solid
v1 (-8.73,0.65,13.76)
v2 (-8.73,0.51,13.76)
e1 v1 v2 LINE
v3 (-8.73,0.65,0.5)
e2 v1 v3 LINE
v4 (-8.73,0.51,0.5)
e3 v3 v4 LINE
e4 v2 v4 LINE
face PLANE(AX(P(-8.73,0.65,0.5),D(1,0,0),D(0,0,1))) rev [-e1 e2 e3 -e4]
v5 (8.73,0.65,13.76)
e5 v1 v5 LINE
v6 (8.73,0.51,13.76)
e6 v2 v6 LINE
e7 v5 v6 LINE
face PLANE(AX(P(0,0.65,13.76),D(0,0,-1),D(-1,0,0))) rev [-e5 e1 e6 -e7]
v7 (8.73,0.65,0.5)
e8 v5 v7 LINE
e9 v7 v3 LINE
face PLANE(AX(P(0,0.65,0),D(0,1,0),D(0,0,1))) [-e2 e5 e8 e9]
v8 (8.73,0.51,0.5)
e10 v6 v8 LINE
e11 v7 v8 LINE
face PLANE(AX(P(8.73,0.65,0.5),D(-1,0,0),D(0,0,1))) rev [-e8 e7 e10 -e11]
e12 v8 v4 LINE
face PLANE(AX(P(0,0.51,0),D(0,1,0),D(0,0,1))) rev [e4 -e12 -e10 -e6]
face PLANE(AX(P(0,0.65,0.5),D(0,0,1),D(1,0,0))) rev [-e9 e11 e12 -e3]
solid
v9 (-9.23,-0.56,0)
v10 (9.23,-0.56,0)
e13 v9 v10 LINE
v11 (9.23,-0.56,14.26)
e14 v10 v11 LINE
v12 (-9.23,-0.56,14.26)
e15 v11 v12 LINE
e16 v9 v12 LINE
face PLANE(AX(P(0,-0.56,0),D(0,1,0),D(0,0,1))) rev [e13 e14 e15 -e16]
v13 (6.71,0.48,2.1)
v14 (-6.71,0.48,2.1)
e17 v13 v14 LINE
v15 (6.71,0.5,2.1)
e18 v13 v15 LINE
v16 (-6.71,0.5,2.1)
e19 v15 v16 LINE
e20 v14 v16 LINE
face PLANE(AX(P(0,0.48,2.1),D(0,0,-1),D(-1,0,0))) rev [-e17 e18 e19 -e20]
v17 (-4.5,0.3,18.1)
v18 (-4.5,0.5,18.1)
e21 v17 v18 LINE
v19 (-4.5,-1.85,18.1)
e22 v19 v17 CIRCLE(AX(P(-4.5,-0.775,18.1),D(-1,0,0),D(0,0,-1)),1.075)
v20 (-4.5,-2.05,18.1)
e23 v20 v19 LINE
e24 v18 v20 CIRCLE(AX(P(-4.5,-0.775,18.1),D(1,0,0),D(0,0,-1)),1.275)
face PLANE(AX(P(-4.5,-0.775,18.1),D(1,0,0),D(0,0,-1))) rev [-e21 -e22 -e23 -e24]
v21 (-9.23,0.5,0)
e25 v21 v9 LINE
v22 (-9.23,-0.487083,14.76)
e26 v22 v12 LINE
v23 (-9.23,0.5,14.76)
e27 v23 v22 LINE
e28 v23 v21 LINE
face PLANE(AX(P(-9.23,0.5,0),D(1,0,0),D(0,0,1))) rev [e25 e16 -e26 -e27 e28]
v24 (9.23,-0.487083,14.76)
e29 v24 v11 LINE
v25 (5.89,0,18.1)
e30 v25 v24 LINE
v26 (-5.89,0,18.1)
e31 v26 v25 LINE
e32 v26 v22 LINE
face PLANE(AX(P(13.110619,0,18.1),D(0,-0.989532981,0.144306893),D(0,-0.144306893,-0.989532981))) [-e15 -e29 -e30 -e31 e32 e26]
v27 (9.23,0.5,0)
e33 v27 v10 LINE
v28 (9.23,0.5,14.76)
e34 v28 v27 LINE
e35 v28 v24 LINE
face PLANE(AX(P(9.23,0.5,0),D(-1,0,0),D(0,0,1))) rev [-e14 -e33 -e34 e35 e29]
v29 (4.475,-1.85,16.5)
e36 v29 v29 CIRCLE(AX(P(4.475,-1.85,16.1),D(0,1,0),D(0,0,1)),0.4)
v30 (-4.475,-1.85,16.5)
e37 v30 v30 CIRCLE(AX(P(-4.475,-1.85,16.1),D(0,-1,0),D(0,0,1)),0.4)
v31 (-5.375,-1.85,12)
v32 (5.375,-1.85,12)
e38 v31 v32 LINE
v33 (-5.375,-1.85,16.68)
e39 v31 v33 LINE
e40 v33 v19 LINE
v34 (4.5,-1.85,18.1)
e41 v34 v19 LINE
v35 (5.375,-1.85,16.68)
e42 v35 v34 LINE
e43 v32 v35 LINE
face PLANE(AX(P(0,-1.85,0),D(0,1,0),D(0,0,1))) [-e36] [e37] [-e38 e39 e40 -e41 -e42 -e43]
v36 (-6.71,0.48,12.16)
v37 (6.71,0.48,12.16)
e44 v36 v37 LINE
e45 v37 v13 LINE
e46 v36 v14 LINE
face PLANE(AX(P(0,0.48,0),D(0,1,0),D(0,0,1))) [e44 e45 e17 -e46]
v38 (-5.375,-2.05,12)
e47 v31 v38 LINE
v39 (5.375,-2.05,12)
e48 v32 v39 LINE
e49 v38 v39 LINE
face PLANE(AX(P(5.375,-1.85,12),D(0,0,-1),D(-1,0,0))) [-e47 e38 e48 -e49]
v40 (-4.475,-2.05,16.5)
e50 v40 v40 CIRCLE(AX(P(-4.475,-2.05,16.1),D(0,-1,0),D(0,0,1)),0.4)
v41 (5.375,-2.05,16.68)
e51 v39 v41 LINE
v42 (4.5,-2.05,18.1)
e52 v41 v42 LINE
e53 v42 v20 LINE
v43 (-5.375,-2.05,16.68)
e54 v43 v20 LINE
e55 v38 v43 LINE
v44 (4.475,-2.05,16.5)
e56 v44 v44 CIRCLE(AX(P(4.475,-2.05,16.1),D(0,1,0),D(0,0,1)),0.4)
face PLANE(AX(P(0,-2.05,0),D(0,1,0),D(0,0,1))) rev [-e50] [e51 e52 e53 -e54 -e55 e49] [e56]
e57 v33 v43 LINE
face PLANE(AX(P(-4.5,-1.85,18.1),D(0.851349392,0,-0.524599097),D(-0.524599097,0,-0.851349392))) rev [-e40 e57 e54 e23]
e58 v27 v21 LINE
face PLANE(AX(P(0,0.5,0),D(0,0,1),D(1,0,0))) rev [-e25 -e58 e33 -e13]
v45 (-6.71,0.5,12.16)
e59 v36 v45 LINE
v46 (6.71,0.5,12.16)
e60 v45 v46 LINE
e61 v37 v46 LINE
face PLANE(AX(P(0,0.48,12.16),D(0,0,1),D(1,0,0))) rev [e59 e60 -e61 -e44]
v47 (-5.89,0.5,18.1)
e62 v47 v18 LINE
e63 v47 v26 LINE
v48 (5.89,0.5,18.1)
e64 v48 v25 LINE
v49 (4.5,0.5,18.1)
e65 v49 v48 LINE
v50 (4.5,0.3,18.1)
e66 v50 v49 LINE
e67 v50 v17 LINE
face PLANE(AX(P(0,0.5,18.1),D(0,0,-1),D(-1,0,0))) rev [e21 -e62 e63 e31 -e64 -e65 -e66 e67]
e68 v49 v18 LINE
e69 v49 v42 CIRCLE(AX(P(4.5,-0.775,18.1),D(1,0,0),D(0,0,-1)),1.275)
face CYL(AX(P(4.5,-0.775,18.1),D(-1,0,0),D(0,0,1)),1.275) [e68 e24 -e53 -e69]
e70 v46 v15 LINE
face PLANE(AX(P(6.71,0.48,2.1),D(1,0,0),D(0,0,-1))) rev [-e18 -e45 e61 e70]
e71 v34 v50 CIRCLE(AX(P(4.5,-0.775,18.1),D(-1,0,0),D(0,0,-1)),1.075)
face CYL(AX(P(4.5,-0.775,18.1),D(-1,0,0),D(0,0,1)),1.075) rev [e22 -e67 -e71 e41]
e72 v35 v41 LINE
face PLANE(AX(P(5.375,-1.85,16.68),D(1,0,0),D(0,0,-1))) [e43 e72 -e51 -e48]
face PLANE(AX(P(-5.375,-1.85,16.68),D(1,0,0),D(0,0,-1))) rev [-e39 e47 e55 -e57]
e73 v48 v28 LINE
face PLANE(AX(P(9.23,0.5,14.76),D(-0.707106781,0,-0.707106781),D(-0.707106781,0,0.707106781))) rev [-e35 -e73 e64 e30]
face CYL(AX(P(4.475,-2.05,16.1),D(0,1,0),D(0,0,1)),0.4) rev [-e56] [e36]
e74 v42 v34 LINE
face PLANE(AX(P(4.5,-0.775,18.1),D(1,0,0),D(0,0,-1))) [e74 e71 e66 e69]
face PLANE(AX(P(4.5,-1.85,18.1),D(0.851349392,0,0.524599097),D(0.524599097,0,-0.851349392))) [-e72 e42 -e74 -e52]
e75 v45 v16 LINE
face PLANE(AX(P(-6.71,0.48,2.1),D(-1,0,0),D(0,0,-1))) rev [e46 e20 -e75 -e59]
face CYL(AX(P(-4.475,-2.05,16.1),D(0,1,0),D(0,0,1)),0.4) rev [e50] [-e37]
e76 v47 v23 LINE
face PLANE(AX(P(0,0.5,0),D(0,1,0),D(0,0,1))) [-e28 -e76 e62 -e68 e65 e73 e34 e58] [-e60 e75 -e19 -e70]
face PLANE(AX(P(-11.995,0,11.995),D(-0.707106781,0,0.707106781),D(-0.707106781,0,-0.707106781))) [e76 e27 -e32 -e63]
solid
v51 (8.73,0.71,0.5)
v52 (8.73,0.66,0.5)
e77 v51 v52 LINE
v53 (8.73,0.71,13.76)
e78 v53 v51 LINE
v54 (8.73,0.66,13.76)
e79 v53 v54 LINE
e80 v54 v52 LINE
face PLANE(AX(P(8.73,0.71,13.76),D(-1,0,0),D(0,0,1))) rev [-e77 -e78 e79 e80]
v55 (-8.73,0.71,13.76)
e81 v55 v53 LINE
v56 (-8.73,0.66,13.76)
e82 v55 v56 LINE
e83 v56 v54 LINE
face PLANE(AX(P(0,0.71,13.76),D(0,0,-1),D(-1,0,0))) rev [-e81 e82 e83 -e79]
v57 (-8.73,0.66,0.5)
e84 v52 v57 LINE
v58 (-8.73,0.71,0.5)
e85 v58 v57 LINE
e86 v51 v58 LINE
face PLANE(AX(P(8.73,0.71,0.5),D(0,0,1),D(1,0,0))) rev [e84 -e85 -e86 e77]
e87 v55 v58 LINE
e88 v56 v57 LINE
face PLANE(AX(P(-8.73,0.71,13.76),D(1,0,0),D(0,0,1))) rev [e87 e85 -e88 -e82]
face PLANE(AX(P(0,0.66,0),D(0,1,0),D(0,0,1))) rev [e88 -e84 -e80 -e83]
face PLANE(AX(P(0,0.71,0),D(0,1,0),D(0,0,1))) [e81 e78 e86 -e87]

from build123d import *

# Parameters (mm, degrees)
EXTRUDE_1_DEPTH      = 0.5
SKETCH_3_W           = 9.23
SKETCH_3_H           = 14.26
EXTRUDE_2_DEPTH      = 0.56
SKETCH_4_W           = 8.73
SKETCH_4_H           = 13.26
EXTRUDE_3_DEPTH      = 0.14
SKETCH_6_W           = 6.71
SKETCH_6_H           = 10.06
CUT_EXTRUDE_1_DEPTH  = 0.02
EXTRUDE_4_REACH      = 22.328
CUT_EXTRUDE_2_DEPTH  = 21.327946281
SKETCH_9_W           = 8.73
SKETCH_9_H           = 13.26
EXTRUDE_2204_DEPTH   = 0.05
MIRROR_START         = 0.5
MIRROR_1_OUTLINE_W   = 8.73
MIRROR_1_OUTLINE_H   = 0.05
MIRROR_1_DEPTH       = 13.26
MIRROR_1_2_OUTLINE_W = 8.73
MIRROR_1_2_OUTLINE_H = 0.14
MIRROR_1_2_DEPTH     = 13.26
MIRROR_1_3_DEPTH     = 0.48
MIRROR_START_2       = -0.56
MIRROR_1_4_OUTLINE_W = 6.71
MIRROR_1_4_OUTLINE_H = 10.06
MIRROR_1_4_DEPTH     = 0.60719
MIRROR_START_3       = 0.48
MIRROR_1_5_DEPTH     = 0.02
MIRROR_START_4       = -9.23
MIRROR_1_6_DEPTH     = 9.23
MIRROR_START_5       = -20
MIRROR_1_7_OUTLINE_W = 8
MIRROR_1_7_OUTLINE_H = 2
MIRROR_1_7_DEPTH     = 3.036508319
EXTRUDE_6_DEPTH      = 4.5
EXTRUDE_7_DEPTH      = 0.2
SKETCH_15_R          = 0.4
CUT_EXTRUDE_3_DEPTH  = 22.613355246


with BuildPart() as part:
    # 草图2 → 凸台-拉伸1 (new body)
    with BuildSketch(Plane(origin=(0, 0, 0), x_dir=(1, 0, 0), z_dir=(0, 1, 0))):
        Polygon((9.23, -14.76), (5.89, -18.1), (0, -18.1), (0, 0), (9.23, 0), align=None)
    extrude(amount=EXTRUDE_1_DEPTH)

    # 草图3 → 凸台-拉伸2 (add)
    with BuildSketch(Plane.XZ):
        with Locations((4.615, 7.13)):
            Rectangle(SKETCH_3_W, SKETCH_3_H)
    extrude(amount=EXTRUDE_2_DEPTH)

    # 草图6 → 切除-拉伸1 (cut)
    with BuildSketch(Plane(origin=(0, 0.5, 0), x_dir=(1, 0, 0), z_dir=(0, 1, 0))):
        with Locations((3.355, -7.13)):
            Rectangle(SKETCH_6_W, SKETCH_6_H)
    extrude(amount=-CUT_EXTRUDE_1_DEPTH, mode=Mode.SUBTRACT)

    # 凸台-拉伸4: up to this face of the body (flat: up to its plane)
    extrude_4_end = Plane(part.part.faces().sort_by_distance((9.23, -0.025444369, 7.250073411))[0])
    # 草图8 → 凸台-拉伸4 (add, up to the picked face)
    with BuildSketch(Plane.ZY, mode=Mode.PRIVATE) as extrude_4_sk1:
        Polygon((14.26, 0), (18.1, 0), (14.26, -0.56), align=None)
    extrude_4_tool1 = split(extrude(extrude_4_sk1.sketch, amount=-EXTRUDE_4_REACH, mode=Mode.PRIVATE), bisect_by=extrude_4_end, keep=Keep.BOTH, mode=Mode.PRIVATE)
    add(extrude_4_tool1.solids().sort_by(Axis((0, -0.186667, 15.54), (1, 0, 0)))[0])

    # 草图12 → 切除-拉伸2 (cut, through all)
    with BuildSketch(Plane(origin=(0, 0, 0), x_dir=(1, 0, 0), z_dir=(0, 1, 0))):
        Polygon((9.23, -14.76), (5.89, -18.1), (9.23, -18.1), align=None)
    extrude(amount=-CUT_EXTRUDE_2_DEPTH, mode=Mode.SUBTRACT)

    # Mirror 1 3 outline → Mirror 1 3 (add)
    with BuildSketch(Plane(origin=(0, 0, 0), x_dir=(1, 0, 0), z_dir=(0, 1, 0))):
        Polygon((-5.89, -18.1), (0, -18.1), (0, 0), (-9.23, 0), (-9.23, -14.76), align=None)
    extrude(amount=MIRROR_1_3_DEPTH)

    # Mirror 1 4 outline → Mirror 1 4 (add)
    with BuildSketch(Plane(origin=(0, 0, 0), x_dir=(1, 0, 0), z_dir=(0, 1, 0)).offset(MIRROR_START_2)):
        with Locations((-3.355, -7.13)):
            Rectangle(MIRROR_1_4_OUTLINE_W, MIRROR_1_4_OUTLINE_H)
    extrude(amount=MIRROR_1_4_DEPTH)

    # Mirror 1 5 outline → Mirror 1 5 (add)
    with BuildSketch(Plane(origin=(0, 0, 0), x_dir=(1, 0, 0), z_dir=(0, 1, 0)).offset(MIRROR_START_3)):
        Polygon((-5.89, -18.1), (0, -18.1), (0, -12.16), (-6.71, -12.16), (-6.71, -2.1), (0, -2.1), (0, 0), (-9.23, 0), (-9.23, -14.76), align=None)
    extrude(amount=MIRROR_1_5_DEPTH)

    # Mirror 1 6 outline → Mirror 1 6 (add)
    with BuildSketch(Plane.YZ.offset(MIRROR_START_4)):
        Polygon((-0.56, 0), (0, 0), (0, 18.1), (-0.56, 14.26), align=None)
    extrude(amount=MIRROR_1_6_DEPTH)

    # Mirror 1 7 outline → Mirror 1 7 (cut)
    with BuildSketch(Plane(origin=(0, 0, 0), x_dir=(0.707106781186552, 0, 0.7071067811865429), z_dir=(0.707106781186543, 0, -0.707106781186552)).offset(MIRROR_START_5)):
        with Locations((6, 1)):
            Rectangle(MIRROR_1_7_OUTLINE_W, MIRROR_1_7_OUTLINE_H)
    extrude(amount=MIRROR_1_7_DEPTH, mode=Mode.SUBTRACT)

    # 草图11 → 凸台-拉伸6 (add, symmetric)
    with BuildSketch(Plane(origin=(0, 0, 0), x_dir=(0, 0, -1), z_dir=(1, 0, 0))):
        with BuildLine():
            Line((-18.1, -2.05), (-18.1, -1.85))
            ThreePointArc((-18.1, -1.85), (-19.175, -0.775), (-18.1, 0.3))
            Line((-18.1, 0.3), (-18.1, 0.5))
            ThreePointArc((-18.1, 0.5), (-19.375, -0.775), (-18.1, -2.05))
        make_face()
    extrude(amount=EXTRUDE_6_DEPTH, both=True)

    # 草图14 → 凸台-拉伸7 (add)
    with BuildSketch(Plane(origin=(0, -2.05, 0), x_dir=(-1, 0, 0), z_dir=(0, -1, 0))):
        Polygon((-5.375, -16.68), (-5.375, -12), (0, -12), (0, -18.1), (-4.5, -18.1), align=None)
    extrude_7 = extrude(amount=-EXTRUDE_7_DEPTH)

    # 草图15 → 切除-拉伸3 (cut, through all)
    with BuildSketch(Plane(origin=(0, -1.85, 0), x_dir=(1, 0, 0), z_dir=(0, 1, 0))):
        with Locations(Location((4.475, -16.1, 0), (0, 0, 270))):
            Circle(SKETCH_15_R)
    cut_extrude_3 = extrude(amount=-CUT_EXTRUDE_3_DEPTH, mode=Mode.SUBTRACT)

    # 镜向2: 凸台-拉伸7, 切除-拉伸3 across Right Plane
    add(extrude_7.mirror(Plane(origin=(0, 0, 0), x_dir=(0, 0, -1), z_dir=(1, 0, 0))))
    add(cut_extrude_3.mirror(Plane(origin=(0, 0, 0), x_dir=(0, 0, -1), z_dir=(1, 0, 0))), mode=Mode.SUBTRACT)


with BuildPart() as body_2:
    # 草图4 → 凸台-拉伸3 (new body)
    with BuildSketch(Plane(origin=(0, 0.51, 0), x_dir=(1, 0, 0), z_dir=(0, 1, 0))):
        with Locations((4.365, -7.13)):
            Rectangle(SKETCH_4_W, SKETCH_4_H)
    extrude(amount=EXTRUDE_3_DEPTH)

    # Mirror 1 2 outline → Mirror 1 2 (add)
    with BuildSketch(Plane.XY.offset(MIRROR_START)):
        with Locations((-4.365, 0.58)):
            Rectangle(MIRROR_1_2_OUTLINE_W, MIRROR_1_2_OUTLINE_H)
    extrude(amount=MIRROR_1_2_DEPTH)


with BuildPart() as body_3:
    # 草图9 → Extrude 2204 (new body)
    with BuildSketch(Plane(origin=(0, 0.66, 0), x_dir=(1, 0, 0), z_dir=(0, 1, 0))):
        with Locations((4.365, -7.13)):
            Rectangle(SKETCH_9_W, SKETCH_9_H)
    extrude(amount=EXTRUDE_2204_DEPTH)

    # 镜向1: read off the stored shape, not the designer's step
    # 镜向1 outline → 镜向1 (add)
    with BuildSketch(Plane.XY.offset(MIRROR_START)):
        with Locations((-4.365, 0.685)):
            Rectangle(MIRROR_1_OUTLINE_W, MIRROR_1_OUTLINE_H)
    extrude(amount=MIRROR_1_DEPTH)


solid = Compound([part.part, body_2.part, body_3.part])
